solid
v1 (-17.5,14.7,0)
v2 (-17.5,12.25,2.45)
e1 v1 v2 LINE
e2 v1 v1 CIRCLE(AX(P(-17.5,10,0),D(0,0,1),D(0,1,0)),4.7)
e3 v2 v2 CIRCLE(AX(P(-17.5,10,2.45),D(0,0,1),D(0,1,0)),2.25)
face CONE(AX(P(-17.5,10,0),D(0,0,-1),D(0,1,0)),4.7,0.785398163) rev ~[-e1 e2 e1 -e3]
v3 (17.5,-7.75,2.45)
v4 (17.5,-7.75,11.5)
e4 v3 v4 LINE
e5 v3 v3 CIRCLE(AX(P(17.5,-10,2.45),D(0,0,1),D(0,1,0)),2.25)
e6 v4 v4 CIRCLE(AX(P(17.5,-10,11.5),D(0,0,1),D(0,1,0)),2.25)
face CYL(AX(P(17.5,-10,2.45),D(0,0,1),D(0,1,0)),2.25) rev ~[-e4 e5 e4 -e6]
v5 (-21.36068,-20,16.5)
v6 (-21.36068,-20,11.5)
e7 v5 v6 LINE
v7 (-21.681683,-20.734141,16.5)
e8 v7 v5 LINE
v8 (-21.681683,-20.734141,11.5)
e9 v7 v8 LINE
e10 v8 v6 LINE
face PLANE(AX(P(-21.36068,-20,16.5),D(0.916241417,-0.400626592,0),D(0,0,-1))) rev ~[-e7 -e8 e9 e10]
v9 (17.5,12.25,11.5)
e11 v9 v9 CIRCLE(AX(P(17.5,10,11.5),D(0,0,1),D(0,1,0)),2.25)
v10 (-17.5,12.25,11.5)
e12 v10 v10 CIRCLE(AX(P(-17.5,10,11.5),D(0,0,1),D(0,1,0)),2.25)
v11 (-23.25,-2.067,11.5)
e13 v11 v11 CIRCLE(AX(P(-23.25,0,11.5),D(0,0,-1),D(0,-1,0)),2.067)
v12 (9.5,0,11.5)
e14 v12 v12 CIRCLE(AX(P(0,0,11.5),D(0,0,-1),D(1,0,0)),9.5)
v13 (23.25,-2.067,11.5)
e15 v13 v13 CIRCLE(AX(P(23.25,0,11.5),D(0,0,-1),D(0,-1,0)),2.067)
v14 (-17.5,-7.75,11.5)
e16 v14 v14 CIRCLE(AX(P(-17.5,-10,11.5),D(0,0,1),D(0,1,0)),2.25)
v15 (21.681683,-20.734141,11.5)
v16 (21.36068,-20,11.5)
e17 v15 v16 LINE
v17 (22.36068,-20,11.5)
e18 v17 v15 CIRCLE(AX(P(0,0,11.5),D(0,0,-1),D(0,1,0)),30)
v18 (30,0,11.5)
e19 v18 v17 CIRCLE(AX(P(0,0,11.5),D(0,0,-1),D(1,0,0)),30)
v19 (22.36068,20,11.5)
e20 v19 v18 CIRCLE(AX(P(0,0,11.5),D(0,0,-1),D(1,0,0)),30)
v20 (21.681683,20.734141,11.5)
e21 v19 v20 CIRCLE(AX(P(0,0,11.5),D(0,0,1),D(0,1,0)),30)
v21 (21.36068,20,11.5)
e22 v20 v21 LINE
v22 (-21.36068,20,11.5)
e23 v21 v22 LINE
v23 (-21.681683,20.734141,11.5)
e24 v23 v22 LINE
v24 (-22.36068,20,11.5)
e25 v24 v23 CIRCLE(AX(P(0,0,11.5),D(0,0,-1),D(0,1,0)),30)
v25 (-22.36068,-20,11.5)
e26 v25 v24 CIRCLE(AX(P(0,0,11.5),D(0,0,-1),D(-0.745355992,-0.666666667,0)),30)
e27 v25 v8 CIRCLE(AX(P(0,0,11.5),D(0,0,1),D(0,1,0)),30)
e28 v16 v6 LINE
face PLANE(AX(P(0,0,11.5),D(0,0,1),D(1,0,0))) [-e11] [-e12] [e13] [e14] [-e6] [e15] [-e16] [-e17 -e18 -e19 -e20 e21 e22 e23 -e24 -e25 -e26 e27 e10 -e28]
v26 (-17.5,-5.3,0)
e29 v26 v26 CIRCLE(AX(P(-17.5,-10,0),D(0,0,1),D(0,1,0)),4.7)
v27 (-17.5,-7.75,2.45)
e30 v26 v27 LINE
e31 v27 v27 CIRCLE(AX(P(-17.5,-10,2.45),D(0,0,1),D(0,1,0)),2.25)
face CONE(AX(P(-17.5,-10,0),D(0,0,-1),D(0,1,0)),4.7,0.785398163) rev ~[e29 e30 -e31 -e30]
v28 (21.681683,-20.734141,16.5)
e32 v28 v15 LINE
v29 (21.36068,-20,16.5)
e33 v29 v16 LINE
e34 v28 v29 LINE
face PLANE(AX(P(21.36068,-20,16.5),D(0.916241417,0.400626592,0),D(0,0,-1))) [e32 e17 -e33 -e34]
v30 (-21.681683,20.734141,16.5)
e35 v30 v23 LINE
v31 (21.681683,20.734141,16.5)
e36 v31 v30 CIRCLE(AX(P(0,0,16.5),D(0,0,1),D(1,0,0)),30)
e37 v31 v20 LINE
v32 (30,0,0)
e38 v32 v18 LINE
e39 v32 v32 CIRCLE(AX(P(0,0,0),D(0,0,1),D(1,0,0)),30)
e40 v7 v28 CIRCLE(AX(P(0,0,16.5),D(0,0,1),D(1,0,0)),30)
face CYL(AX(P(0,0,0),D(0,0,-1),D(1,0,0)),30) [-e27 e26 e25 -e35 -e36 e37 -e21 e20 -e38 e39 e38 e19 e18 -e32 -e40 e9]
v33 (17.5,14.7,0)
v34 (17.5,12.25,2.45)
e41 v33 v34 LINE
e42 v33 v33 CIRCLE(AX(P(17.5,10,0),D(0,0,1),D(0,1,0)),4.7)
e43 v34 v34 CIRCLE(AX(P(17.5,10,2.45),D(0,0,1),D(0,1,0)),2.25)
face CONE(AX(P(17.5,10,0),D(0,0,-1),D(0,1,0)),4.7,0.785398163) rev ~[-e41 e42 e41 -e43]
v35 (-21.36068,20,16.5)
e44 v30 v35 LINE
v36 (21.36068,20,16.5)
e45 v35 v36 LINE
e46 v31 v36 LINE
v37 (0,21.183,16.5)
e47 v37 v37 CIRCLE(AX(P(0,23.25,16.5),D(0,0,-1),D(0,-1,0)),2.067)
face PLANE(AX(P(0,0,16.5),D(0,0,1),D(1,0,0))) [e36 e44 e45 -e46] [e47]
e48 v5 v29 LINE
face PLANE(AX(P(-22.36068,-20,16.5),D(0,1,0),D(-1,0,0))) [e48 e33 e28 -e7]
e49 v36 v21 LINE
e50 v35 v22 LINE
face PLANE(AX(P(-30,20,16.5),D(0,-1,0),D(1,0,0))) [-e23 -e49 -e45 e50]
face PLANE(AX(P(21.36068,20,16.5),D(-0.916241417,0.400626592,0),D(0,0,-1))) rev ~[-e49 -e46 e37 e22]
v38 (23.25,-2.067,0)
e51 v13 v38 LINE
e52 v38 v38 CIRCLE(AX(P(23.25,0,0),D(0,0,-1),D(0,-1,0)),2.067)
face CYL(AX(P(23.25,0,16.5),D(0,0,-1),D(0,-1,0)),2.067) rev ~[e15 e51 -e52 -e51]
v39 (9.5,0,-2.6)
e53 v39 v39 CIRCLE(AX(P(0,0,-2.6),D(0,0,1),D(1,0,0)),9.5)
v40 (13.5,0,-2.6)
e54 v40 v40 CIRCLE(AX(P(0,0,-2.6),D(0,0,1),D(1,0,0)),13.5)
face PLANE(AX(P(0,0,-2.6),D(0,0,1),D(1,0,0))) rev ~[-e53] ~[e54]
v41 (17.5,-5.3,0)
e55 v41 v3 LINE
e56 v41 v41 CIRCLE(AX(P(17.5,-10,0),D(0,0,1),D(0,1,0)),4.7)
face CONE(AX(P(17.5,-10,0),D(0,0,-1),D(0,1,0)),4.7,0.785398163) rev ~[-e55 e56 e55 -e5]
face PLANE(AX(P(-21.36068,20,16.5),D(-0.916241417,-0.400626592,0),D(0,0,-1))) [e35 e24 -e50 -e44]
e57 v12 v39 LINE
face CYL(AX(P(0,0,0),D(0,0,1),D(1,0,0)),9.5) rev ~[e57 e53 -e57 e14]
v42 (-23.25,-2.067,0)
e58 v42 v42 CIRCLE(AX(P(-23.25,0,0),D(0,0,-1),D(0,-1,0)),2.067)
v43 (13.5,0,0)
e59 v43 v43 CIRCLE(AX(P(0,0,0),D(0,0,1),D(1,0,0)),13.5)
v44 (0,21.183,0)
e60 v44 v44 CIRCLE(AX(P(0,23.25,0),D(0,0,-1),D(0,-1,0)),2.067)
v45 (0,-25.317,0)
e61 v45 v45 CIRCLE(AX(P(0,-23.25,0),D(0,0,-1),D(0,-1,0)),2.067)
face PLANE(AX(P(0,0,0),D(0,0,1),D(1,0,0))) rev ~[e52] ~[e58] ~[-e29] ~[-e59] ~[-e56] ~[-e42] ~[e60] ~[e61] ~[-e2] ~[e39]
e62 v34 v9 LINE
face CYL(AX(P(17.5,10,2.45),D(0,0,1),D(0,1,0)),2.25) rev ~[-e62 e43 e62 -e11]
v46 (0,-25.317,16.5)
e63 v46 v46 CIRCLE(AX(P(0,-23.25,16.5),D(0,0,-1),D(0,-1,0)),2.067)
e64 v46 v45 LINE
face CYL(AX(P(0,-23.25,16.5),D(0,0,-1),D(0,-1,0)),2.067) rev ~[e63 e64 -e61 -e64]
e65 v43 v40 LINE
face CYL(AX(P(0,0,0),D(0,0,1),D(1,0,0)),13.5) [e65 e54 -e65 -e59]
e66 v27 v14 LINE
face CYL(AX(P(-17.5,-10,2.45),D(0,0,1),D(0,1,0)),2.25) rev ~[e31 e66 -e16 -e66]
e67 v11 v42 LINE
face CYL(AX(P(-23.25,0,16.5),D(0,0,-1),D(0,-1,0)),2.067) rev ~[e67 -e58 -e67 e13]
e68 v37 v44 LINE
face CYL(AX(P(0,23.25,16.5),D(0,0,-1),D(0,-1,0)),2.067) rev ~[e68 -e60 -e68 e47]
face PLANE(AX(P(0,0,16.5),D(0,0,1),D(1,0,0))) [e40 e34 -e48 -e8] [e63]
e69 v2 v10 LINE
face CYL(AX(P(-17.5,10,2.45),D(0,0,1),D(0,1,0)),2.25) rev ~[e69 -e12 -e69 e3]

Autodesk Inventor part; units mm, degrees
ref_plane "Arbeitsebene3" through (0, 0, 50) normal (0, 0, 1) x (1, 0, 0)
ref_plane "Arbeitsebene4" through (0, 0, 130) normal (0, 0, 1) x (1, 0, 0)
sketch "Skizze1" plane through (0, 0, 0) normal (0, 0, 1) x (1, 0, 0)
  circle A0 centre (0, 0) radius 30
  circle A1 centre (0, 0) radius 13.5
  circle A2 centre (0, 0) radius 9.5
  circle A3 centre (0, 0) radius 23.25 construction
  line L0 (0, 0) -> (0, 23.25) construction
  line L1 (0, 0) -> (0, 30) construction
  point P0 (-23.25, 0)
  point P1 (0, -23.25)
  point P2 (23.25, 0)
  dimension "d3" = 30
  dimension "d4" = 46.5
  dimension "d0" = 4
  dimension "d1" = 27
  dimension "d7" = 360
  dimension "d99" = 0
extrude "Extrusion1" add sketch "Skizze1" along normal blind 16.5 contours A0 | A1
extrude "Extrusion2" add sketch "Skizze1" against normal blind 2.6 contours A1
sketch "Skizze2" plane through (0, 0, 16.5) normal (0, 0, 1) x (1, 0, 0)
  point P0 (0, 0)
  point P1 (0, 23.25)
  point P2 (23.25, 0)
  point P3 (0, -23.25)
  point P4 (-23.25, 0)
hole "Bohrung1" at (0, 23.25, 16.5) at (23.25, 0, 16.5) at (0, -23.25, 16.5) at (-23.25, 0, 16.5) direction (0, 0, -1) diameter 4.134 end through all thread size "M5x0.8" class "6H" standard "ISO Metric profile"
ref_plane "Arbeitsebene1" through (0, 0, 10) normal (0, 0, 1) x (1, 0, 0)
sketch "Skizze10" plane through (0, 0, 16.5) normal (0, 0, 1) x (1, 0, 0)
  line L0 (-30, 20) -> (30, 20)
  line L1 (30, 20) -> (30, -20)
  line L2 (30, -20) -> (-30, -20)
  line L3 (-30, -20) -> (-30, 20)
  line L4 (-30, 20) -> (30, -20) construction
  line L5 (30, 20) -> (-30, -20) construction
  circle A0 centre (0, 0) radius 30 projected
  circle A1 centre (-23.25, 0) radius 2.067 construction
  circle A2 centre (0, -23.25) radius 2.067 construction
  line L6 (-20, 0) -> (20, 0) construction
  circle A3 centre (0, 0) radius 30 projected
  line L7 (0, 42) -> (0, -42) construction
  line L8 (-17.5, 10) -> (17.5, 10) construction
  line L9 (17.5, 10) -> (17.5, -10) construction
  line L10 (17.5, -10) -> (-17.5, -10) construction
  line L11 (-17.5, -10) -> (-17.5, 10) construction
  line L12 (-17.5, 10) -> (17.5, -10) construction
  line L13 (17.5, 10) -> (-17.5, -10) construction
  point P0 (-22.3607, 20)
  point P1 (-22.3607, -20)
  point P2 (22.3607, -20)
  point P3 (22.3607, 20)
  point P4 (30, 0)
  point P5 (-30, 0)
  dimension "d81" = 40
  dimension "ItemFixation_HoleDia" = 40
  dimension "d102" = 20
  dimension "d103" = 35
extrude "Extrusion7" cut sketch "Skizze10" against normal blind 5 contours L0 A0 L3 | L0 A0 L2 | A0 L2 L3 | L0 L1 A0 | L1 L2 A0
sketch "Skizze11" plane through (0, 0, 0) normal (0, 0, -1) x (-1, 0, 0)
  point P0 (0, 0)
  point P1 (-17.5, 10)
  point P2 (-17.5, -10)
  point P3 (17.5, -10)
  point P4 (17.5, 10)
  dimension "MainAxis_Schluesselweite" = 24
  dimension "d46" = 1
  dimension "d52" = 32
hole "Bohrung4" at (17.5, 10, 0) at (17.5, -10, 0) at (-17.5, -10, 0) at (-17.5, 10, 0) direction (0, 0, 1) diameter 4.5 end through all countersink diameter 9.4 countersink angle 90 clearance for "Senkschraube mit Linsenkopf ISO 2010" size "M4" standard "DIN"
chamfer "Fase3" distance 1 angle 45 4 edges at (22.3607, 20, 14) (-22.3607, 20, 14) (-22.3607, -20, 14) (22.3607, -20, 14)
sketch "Skizze8" plane through (12, -16, 160) normal (1, 0, 0) x (0, 0, -1)
  line L0 (30, -26) -> (30, 58) construction
  line L1 (-32.52, 16) -> (195.12, 16) construction
  point P0 (160, 16)
  point P1 (30, 16)
  dimension "Flansch_ParralelMech_FlatPart_Width" = 140
sketch "Skizze4" plane through (0, 0, 0) normal (1, 0, 0) x (0, 1, 0)
  line L0 (9.5, -2.6) -> (-9.5, -2.6) construction
  line L1 (0, 200.32) -> (0, -36.42) construction
  line L2 (-9.5, 16.5) -> (-9.5, -2.6) construction
  line L3 (9.5, 16.5) -> (9.5, -2.6) construction
  line L4 (-9.5, 16.5) -> (9.5, 16.5) construction
  line L5 (-9.5, 2.4) -> (9.5, 2.4)
  line L6 (-9.5, 2.4) -> (-9.5, 16.5)
  line L7 (-9.5, 16.5) -> (-20, 16.5)
  line L8 (-20, 16.5) -> (-20, 166.5)
  line L9 (-20, 166.5) -> (20, 166.5)
  line L10 (20, 16.5) -> (9.5, 16.5)
  line L11 (9.5, 16.5) -> (9.5, 2.4)
  line L12 (20, 166.5) -> (20, 16.5)
  line L13 (0, 2.4) -> (0, 166.5)
  point P0 (0, 0)
  dimension "d27" = 5
  dimension "d31" = 150
  dimension "d33" = 40
sketch "Skizze7" plane through (0, 0, 50) normal (0, 0, 1) x (1, 0, 0)
  line L0 (-12, 16) -> (-12, -16) construction
  line L1 (-12, 15) -> (-3, 15)
  line L2 (-3, 15) -> (-3, 11.425)
  line L3 (-3, 11.425) -> (3, 11.425)
  line L4 (3, 11.425) -> (3, 15)
  line L5 (3, 15) -> (12, 15)
  line L6 (-12, 0) -> (-12, 15)
  line L7 (0, -16) -> (0, 16) construction
  line L8 (12, -16) -> (12, 16) construction
  line L9 (12, 15) -> (12, 0)
  line L10 (-12, 0) -> (12, 0)
  line L11 (-42, 0) -> (42, 0) construction
  point P0 (0, 11.425)
  point P1 (-12, -7.2111)
  point P2 (12, 7.2111)
  dimension "d51" = 9
  dimension "d63" = 30
  dimension "d64" = 22.85
equation "\"d3\" = Flansch_FemalePart_OuterDia"
equation "\"d4\" = Flansch_FemalePart_HoleDia"
equation "\"d1\" = Flansch_Klemmdeckelausnahme_Dia"
equation "\"d102\" = Item40x40_TrackDistance"
equation "\"d33\" = d28"
equation "\"Total_Bearing_Hole_Dist\" = 80"
equation "\"Flansch_FemalePart_OuterDia\" = 30"
equation "\"Flansch_FemalePart_HoleDia\" = 46.5"
equation "\"Flansch_Klemmdeckelausnahme_Dia\" = 27"
equation "\"Item40x40_TrackDistance\" = 20"
equation "\"d28\" = 40"
properties part number "Flansch_FemalePart_MainAxis_HeadConnectorBase_V2.1_Item40x40" material "Edelstahl"
